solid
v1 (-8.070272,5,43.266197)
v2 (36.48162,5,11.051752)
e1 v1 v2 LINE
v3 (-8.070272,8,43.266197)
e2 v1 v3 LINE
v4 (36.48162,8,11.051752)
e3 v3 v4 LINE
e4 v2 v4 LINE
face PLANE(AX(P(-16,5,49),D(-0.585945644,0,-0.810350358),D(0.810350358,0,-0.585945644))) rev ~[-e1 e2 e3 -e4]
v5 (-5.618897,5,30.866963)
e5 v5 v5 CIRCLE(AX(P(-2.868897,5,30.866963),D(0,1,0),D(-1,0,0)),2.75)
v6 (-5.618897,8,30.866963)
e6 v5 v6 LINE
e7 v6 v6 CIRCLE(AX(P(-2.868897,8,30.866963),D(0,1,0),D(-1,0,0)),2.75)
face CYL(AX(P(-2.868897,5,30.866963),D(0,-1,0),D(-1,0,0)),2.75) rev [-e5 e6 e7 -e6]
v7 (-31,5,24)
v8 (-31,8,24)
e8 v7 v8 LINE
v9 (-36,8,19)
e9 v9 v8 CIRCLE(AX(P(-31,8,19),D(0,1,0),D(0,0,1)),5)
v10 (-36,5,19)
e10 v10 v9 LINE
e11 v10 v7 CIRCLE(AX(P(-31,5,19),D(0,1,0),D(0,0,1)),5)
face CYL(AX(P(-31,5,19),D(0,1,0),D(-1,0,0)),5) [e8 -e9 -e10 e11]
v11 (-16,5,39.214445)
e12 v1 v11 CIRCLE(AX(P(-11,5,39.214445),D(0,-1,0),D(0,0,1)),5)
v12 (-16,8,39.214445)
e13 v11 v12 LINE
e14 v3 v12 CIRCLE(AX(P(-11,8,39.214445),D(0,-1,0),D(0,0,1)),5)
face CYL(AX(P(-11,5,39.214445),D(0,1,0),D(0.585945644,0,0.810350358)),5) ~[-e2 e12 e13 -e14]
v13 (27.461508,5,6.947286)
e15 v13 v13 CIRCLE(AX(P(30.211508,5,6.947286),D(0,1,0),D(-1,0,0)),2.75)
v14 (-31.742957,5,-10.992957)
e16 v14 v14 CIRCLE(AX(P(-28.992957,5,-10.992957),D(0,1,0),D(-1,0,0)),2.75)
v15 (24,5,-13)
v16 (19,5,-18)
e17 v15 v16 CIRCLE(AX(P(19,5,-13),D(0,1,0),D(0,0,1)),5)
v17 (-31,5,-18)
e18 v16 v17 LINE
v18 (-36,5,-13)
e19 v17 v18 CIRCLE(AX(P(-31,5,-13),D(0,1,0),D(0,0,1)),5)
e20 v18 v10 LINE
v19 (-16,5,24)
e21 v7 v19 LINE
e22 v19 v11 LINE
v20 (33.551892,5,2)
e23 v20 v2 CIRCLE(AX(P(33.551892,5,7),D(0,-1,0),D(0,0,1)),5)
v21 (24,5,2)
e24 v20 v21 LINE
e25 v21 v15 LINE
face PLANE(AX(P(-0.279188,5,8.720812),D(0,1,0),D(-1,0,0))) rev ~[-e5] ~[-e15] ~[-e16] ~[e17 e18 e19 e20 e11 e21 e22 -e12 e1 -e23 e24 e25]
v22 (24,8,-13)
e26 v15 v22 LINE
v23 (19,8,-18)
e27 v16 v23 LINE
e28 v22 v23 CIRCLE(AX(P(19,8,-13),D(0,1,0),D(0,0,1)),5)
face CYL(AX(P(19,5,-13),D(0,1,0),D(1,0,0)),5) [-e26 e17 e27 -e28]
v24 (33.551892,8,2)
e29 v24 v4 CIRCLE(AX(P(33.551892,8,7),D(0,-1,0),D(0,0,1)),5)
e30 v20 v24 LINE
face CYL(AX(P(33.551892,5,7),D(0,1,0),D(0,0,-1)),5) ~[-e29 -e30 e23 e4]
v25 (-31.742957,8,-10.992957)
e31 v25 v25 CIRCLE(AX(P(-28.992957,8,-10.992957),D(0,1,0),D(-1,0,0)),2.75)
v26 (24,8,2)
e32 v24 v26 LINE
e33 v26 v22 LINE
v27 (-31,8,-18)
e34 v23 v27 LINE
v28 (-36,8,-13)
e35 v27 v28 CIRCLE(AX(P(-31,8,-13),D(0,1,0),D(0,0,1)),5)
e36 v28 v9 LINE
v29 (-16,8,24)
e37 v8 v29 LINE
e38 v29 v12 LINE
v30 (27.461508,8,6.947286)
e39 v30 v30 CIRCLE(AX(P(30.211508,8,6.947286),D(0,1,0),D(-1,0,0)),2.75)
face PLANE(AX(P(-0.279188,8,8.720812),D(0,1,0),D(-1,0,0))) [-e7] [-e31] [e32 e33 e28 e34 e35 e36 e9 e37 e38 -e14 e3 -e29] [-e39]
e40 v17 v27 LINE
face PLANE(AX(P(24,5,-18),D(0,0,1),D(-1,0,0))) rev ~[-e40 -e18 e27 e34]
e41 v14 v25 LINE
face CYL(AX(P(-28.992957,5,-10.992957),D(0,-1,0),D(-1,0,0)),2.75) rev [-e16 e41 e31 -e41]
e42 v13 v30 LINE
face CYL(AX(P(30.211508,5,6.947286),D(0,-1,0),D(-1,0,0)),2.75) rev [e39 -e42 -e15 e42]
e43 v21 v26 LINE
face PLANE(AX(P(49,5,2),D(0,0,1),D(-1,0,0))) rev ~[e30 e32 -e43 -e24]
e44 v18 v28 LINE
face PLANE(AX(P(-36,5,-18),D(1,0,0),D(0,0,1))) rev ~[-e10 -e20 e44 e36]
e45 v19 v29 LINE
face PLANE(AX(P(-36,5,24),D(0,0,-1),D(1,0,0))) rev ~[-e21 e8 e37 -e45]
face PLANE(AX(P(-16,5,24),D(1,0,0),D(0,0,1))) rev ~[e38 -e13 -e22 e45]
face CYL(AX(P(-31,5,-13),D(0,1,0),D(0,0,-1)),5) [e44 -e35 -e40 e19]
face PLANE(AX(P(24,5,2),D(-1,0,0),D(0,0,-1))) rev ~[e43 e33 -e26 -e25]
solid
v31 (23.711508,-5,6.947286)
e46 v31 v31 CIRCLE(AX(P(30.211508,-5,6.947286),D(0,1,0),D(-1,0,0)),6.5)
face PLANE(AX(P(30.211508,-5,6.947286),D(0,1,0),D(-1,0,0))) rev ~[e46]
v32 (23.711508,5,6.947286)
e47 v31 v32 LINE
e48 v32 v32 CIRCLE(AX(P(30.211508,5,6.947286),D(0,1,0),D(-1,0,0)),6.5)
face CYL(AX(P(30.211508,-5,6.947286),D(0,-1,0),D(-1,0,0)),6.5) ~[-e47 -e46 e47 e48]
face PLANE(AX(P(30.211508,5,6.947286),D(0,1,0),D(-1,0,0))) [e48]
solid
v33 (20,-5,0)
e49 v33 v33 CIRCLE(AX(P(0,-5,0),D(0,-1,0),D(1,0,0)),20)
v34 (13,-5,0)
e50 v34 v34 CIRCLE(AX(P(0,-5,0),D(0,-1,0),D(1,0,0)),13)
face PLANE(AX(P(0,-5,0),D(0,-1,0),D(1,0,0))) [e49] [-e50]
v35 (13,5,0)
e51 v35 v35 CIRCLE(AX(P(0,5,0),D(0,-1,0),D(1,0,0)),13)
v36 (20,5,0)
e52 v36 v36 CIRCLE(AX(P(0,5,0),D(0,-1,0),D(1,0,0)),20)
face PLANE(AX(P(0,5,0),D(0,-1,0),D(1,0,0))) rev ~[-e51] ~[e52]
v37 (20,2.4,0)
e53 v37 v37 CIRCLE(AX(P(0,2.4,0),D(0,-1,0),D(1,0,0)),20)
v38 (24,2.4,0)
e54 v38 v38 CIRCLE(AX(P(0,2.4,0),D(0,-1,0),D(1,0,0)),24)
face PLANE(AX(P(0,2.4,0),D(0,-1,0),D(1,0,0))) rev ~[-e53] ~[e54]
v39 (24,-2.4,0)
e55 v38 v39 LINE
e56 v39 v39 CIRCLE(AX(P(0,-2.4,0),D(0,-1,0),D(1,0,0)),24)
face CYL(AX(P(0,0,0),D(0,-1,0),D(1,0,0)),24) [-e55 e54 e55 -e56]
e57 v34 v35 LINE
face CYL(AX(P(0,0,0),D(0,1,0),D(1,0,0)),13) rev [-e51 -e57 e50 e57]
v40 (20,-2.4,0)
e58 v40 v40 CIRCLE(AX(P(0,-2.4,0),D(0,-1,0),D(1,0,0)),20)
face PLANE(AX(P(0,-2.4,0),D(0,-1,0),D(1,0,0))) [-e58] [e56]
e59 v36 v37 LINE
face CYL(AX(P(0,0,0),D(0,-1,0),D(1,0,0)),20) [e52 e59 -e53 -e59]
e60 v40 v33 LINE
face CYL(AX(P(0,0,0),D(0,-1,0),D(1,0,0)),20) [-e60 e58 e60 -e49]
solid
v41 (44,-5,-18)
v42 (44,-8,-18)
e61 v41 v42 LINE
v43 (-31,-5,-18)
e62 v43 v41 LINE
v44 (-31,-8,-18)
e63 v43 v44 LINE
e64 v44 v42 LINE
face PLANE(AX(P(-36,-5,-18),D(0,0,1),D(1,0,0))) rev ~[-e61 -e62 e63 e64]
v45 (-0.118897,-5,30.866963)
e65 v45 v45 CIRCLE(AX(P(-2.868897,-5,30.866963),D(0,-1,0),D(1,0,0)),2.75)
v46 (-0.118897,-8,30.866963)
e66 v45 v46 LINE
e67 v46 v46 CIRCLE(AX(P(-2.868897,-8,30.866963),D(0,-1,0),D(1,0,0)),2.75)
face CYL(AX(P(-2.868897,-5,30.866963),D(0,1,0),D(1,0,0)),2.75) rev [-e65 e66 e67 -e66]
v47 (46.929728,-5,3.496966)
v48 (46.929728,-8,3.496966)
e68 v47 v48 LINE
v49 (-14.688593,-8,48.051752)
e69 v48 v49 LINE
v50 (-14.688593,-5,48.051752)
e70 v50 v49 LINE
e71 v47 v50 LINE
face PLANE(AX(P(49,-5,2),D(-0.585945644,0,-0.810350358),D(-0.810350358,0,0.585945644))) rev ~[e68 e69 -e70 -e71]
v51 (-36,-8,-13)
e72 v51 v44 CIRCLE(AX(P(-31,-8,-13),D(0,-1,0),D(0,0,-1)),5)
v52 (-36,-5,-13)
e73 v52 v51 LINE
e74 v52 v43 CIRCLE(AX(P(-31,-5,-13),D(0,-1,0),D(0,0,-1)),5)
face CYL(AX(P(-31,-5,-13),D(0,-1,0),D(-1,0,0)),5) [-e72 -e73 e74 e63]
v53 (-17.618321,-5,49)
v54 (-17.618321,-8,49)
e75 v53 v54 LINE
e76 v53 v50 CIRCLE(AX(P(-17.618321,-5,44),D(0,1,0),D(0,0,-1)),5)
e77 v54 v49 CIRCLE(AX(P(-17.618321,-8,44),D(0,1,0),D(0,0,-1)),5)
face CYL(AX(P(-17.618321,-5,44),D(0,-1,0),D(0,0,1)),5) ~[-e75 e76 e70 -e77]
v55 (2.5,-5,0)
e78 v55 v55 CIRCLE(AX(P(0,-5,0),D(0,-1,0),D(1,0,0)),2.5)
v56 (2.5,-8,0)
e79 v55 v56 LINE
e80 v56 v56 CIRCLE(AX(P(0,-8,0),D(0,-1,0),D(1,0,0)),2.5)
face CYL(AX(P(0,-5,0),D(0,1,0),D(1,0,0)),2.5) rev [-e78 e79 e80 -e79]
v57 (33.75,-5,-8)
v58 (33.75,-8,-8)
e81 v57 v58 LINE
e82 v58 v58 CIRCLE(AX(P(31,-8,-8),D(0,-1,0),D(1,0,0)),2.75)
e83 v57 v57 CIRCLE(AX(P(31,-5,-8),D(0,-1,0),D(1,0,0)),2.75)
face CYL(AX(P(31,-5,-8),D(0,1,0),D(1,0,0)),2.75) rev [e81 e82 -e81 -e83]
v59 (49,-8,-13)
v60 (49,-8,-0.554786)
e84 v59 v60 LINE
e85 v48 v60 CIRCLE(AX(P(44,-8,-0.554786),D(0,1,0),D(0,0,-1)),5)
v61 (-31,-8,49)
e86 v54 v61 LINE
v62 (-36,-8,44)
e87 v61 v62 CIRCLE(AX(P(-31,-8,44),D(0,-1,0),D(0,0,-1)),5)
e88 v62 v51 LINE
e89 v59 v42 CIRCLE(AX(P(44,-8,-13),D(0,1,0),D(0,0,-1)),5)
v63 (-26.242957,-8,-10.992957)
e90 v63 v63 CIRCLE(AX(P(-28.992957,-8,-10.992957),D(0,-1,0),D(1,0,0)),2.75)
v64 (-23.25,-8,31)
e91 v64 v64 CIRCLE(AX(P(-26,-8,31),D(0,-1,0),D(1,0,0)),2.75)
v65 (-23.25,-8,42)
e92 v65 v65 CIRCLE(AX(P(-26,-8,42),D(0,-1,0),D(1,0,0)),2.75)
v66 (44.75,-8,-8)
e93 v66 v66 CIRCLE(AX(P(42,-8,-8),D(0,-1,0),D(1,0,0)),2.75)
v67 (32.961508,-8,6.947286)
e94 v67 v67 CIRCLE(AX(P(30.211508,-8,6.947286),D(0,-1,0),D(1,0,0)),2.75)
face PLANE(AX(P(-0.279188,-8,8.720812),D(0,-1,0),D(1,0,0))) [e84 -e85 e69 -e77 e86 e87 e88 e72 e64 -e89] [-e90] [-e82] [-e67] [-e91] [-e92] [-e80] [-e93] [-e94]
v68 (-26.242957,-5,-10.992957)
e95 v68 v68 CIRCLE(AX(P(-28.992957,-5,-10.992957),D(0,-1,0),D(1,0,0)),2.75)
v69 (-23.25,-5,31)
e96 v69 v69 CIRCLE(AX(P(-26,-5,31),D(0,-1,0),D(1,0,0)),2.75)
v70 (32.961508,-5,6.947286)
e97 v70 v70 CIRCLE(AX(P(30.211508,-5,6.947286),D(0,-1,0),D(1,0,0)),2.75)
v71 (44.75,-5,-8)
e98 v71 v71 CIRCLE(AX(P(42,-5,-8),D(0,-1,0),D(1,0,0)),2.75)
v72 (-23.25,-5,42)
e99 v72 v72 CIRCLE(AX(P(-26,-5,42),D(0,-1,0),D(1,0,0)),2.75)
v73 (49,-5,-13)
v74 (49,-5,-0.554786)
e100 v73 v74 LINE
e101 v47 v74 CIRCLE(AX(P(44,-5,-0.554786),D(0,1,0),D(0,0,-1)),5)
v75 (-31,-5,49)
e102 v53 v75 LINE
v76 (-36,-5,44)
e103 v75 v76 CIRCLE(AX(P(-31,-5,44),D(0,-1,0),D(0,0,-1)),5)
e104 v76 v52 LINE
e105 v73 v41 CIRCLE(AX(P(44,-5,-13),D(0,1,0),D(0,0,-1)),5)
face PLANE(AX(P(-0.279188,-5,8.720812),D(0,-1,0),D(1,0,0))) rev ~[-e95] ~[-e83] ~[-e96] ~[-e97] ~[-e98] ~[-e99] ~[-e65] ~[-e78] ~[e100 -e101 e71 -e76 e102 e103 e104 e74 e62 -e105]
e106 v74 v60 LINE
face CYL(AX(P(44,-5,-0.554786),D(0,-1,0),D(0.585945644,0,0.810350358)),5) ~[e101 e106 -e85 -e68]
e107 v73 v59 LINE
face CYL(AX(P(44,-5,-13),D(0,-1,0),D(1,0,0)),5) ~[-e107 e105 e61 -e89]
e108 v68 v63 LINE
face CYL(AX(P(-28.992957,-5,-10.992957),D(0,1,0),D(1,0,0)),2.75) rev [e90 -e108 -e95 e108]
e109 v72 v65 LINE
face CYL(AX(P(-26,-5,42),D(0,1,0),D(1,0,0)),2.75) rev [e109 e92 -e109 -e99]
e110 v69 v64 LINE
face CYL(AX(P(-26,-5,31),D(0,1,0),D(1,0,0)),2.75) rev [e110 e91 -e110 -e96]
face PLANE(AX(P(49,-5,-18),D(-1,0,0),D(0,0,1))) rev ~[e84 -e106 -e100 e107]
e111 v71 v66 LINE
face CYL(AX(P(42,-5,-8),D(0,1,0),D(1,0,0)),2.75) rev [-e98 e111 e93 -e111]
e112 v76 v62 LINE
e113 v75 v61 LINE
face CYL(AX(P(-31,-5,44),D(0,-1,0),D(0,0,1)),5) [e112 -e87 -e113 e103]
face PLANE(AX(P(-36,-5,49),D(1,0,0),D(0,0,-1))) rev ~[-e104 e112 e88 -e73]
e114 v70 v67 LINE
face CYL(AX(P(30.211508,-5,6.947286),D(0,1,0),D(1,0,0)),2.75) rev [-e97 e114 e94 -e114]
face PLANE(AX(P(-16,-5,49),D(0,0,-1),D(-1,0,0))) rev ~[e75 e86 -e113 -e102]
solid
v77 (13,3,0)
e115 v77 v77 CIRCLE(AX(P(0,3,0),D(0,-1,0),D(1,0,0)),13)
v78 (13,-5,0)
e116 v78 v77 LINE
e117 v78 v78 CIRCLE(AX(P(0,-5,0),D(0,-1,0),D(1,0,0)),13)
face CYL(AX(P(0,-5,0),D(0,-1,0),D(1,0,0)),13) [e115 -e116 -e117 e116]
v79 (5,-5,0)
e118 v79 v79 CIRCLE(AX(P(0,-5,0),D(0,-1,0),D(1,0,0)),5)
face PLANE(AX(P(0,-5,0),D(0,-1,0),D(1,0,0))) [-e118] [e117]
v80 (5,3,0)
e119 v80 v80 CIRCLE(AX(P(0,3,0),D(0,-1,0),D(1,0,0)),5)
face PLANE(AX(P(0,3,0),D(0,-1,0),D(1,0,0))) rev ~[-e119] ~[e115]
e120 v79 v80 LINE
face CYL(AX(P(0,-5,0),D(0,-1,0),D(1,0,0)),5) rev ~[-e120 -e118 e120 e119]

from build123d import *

# Parameters (mm, degrees)
F0_R      = 20
F0_R_2    = 13
F1_DEPTH  = 5
F0_R_3    = 24
F2_DEPTH  = 2.4
F4_R      = 2.75
F4_R_2    = 2.5
F5_DEPTH  = 3
F6_R      = 13
F6_R_2    = 5
F7_DEPTH  = 8
F8_R      = 2.75
F9_DEPTH  = 3
F10_R     = 5
F10_2_R   = 5
F11_R     = 6.5
F12_DEPTH = 10


# Not quite as in the source:
# - a feature names something its author has since deleted; it is built from what else it names


with BuildPart() as f1:
    # F0 (on Front) → F1 (new body, symmetric)
    with BuildSketch(Plane.XZ):
        Circle(F0_R)
        Circle(F0_R_2, mode=Mode.SUBTRACT)
    extrude(amount=F1_DEPTH, both=True)

    # F0 (on Front) → F2 (join, symmetric)
    with BuildSketch(Plane.XZ):
        Circle(F0_R_3)
        Circle(F0_R, mode=Mode.SUBTRACT)
    extrude(amount=F2_DEPTH, both=True)


with BuildPart() as f5:
    # F4 (on offset) → F5 (new body)
    with BuildSketch(Plane.XZ.offset(5)):
        Polygon((-16, 49), (-36, 49), (-36, -18), (49, -18), (49, 2), align=None)
        with Locations((-28.9929573972, -10.9929573972)):
            Circle(F4_R, mode=Mode.SUBTRACT)
        Circle(F4_R_2, mode=Mode.SUBTRACT)
        with Locations((31, -8)):
            Circle(F4_R, mode=Mode.SUBTRACT)
        with Locations((42, -8)):
            Circle(F4_R, mode=Mode.SUBTRACT)
        with Locations((30.2115080133, 6.9472860574)):
            Circle(F4_R, mode=Mode.SUBTRACT)
        with Locations((-26, 31)):
            Circle(F4_R, mode=Mode.SUBTRACT)
        with Locations((-2.8688968517, 30.8669634213)):
            Circle(F4_R, mode=Mode.SUBTRACT)
        with Locations((-26, 42)):
            Circle(F4_R, mode=Mode.SUBTRACT)
    extrude(amount=F5_DEPTH)

    # F10#2
    f10_2_edges = [f5.edges().sort_by_distance(p)[0] for p in [
        (-36, -6.5, 49),
        (-36, -6.5, -18),
        (49, -6.5, -18),
        (49, -6.5, 2),
        (-16, -6.5, 49),
    ]]
    fillet(f10_2_edges, radius=F10_2_R)


with BuildPart() as f7:
    # F6 (on offset) → F7 (new body)
    with BuildSketch(Plane.XZ.offset(5)):
        Circle(F6_R)
        Circle(F6_R_2, mode=Mode.SUBTRACT)
    extrude(amount=-F7_DEPTH)


with BuildPart() as f9:
    # F8 (on face) → F9 (new body)
    with BuildSketch(Plane(origin=(0, 5, 0), x_dir=(-1, 0, 0), z_dir=(0, 1, 0))):
        Polygon((-24, 2), (-24, -18), (36, -18), (36, 24), (16, 24), (16, 49), (-49, 2), align=None)
        with Locations((-30.2115080133, 6.9472860574)):
            Circle(F8_R, mode=Mode.SUBTRACT)
        with Locations((28.9929573972, -10.9929573972)):
            Circle(F8_R, mode=Mode.SUBTRACT)
        with Locations((2.8688968517, 30.8669634213)):
            Circle(F8_R, mode=Mode.SUBTRACT)
    extrude(amount=F9_DEPTH)

    # F10
    f10_edges = [f9.edges().sort_by_distance(p)[0] for p in [
        (49, 6.5, 2),
        (-16, 6.5, 49),
        (-36, 6.5, -18),
        (-36, 6.5, 24),
        (24, 6.5, -18),
    ]]
    fillet(f10_edges, radius=F10_R)


with BuildPart() as f12:
    # F11 (on face) → F12 (new body, through all)
    with BuildSketch(Plane(origin=(0, -5, 0), x_dir=(-1, 0, 0), z_dir=(0, 1, 0))):
        with Locations((-30.2115080133, 6.9472860574)):
            Circle(F11_R)
    extrude(amount=F12_DEPTH)


solid = Compound([f1.part, f5.part, f7.part, f9.part, f12.part])
